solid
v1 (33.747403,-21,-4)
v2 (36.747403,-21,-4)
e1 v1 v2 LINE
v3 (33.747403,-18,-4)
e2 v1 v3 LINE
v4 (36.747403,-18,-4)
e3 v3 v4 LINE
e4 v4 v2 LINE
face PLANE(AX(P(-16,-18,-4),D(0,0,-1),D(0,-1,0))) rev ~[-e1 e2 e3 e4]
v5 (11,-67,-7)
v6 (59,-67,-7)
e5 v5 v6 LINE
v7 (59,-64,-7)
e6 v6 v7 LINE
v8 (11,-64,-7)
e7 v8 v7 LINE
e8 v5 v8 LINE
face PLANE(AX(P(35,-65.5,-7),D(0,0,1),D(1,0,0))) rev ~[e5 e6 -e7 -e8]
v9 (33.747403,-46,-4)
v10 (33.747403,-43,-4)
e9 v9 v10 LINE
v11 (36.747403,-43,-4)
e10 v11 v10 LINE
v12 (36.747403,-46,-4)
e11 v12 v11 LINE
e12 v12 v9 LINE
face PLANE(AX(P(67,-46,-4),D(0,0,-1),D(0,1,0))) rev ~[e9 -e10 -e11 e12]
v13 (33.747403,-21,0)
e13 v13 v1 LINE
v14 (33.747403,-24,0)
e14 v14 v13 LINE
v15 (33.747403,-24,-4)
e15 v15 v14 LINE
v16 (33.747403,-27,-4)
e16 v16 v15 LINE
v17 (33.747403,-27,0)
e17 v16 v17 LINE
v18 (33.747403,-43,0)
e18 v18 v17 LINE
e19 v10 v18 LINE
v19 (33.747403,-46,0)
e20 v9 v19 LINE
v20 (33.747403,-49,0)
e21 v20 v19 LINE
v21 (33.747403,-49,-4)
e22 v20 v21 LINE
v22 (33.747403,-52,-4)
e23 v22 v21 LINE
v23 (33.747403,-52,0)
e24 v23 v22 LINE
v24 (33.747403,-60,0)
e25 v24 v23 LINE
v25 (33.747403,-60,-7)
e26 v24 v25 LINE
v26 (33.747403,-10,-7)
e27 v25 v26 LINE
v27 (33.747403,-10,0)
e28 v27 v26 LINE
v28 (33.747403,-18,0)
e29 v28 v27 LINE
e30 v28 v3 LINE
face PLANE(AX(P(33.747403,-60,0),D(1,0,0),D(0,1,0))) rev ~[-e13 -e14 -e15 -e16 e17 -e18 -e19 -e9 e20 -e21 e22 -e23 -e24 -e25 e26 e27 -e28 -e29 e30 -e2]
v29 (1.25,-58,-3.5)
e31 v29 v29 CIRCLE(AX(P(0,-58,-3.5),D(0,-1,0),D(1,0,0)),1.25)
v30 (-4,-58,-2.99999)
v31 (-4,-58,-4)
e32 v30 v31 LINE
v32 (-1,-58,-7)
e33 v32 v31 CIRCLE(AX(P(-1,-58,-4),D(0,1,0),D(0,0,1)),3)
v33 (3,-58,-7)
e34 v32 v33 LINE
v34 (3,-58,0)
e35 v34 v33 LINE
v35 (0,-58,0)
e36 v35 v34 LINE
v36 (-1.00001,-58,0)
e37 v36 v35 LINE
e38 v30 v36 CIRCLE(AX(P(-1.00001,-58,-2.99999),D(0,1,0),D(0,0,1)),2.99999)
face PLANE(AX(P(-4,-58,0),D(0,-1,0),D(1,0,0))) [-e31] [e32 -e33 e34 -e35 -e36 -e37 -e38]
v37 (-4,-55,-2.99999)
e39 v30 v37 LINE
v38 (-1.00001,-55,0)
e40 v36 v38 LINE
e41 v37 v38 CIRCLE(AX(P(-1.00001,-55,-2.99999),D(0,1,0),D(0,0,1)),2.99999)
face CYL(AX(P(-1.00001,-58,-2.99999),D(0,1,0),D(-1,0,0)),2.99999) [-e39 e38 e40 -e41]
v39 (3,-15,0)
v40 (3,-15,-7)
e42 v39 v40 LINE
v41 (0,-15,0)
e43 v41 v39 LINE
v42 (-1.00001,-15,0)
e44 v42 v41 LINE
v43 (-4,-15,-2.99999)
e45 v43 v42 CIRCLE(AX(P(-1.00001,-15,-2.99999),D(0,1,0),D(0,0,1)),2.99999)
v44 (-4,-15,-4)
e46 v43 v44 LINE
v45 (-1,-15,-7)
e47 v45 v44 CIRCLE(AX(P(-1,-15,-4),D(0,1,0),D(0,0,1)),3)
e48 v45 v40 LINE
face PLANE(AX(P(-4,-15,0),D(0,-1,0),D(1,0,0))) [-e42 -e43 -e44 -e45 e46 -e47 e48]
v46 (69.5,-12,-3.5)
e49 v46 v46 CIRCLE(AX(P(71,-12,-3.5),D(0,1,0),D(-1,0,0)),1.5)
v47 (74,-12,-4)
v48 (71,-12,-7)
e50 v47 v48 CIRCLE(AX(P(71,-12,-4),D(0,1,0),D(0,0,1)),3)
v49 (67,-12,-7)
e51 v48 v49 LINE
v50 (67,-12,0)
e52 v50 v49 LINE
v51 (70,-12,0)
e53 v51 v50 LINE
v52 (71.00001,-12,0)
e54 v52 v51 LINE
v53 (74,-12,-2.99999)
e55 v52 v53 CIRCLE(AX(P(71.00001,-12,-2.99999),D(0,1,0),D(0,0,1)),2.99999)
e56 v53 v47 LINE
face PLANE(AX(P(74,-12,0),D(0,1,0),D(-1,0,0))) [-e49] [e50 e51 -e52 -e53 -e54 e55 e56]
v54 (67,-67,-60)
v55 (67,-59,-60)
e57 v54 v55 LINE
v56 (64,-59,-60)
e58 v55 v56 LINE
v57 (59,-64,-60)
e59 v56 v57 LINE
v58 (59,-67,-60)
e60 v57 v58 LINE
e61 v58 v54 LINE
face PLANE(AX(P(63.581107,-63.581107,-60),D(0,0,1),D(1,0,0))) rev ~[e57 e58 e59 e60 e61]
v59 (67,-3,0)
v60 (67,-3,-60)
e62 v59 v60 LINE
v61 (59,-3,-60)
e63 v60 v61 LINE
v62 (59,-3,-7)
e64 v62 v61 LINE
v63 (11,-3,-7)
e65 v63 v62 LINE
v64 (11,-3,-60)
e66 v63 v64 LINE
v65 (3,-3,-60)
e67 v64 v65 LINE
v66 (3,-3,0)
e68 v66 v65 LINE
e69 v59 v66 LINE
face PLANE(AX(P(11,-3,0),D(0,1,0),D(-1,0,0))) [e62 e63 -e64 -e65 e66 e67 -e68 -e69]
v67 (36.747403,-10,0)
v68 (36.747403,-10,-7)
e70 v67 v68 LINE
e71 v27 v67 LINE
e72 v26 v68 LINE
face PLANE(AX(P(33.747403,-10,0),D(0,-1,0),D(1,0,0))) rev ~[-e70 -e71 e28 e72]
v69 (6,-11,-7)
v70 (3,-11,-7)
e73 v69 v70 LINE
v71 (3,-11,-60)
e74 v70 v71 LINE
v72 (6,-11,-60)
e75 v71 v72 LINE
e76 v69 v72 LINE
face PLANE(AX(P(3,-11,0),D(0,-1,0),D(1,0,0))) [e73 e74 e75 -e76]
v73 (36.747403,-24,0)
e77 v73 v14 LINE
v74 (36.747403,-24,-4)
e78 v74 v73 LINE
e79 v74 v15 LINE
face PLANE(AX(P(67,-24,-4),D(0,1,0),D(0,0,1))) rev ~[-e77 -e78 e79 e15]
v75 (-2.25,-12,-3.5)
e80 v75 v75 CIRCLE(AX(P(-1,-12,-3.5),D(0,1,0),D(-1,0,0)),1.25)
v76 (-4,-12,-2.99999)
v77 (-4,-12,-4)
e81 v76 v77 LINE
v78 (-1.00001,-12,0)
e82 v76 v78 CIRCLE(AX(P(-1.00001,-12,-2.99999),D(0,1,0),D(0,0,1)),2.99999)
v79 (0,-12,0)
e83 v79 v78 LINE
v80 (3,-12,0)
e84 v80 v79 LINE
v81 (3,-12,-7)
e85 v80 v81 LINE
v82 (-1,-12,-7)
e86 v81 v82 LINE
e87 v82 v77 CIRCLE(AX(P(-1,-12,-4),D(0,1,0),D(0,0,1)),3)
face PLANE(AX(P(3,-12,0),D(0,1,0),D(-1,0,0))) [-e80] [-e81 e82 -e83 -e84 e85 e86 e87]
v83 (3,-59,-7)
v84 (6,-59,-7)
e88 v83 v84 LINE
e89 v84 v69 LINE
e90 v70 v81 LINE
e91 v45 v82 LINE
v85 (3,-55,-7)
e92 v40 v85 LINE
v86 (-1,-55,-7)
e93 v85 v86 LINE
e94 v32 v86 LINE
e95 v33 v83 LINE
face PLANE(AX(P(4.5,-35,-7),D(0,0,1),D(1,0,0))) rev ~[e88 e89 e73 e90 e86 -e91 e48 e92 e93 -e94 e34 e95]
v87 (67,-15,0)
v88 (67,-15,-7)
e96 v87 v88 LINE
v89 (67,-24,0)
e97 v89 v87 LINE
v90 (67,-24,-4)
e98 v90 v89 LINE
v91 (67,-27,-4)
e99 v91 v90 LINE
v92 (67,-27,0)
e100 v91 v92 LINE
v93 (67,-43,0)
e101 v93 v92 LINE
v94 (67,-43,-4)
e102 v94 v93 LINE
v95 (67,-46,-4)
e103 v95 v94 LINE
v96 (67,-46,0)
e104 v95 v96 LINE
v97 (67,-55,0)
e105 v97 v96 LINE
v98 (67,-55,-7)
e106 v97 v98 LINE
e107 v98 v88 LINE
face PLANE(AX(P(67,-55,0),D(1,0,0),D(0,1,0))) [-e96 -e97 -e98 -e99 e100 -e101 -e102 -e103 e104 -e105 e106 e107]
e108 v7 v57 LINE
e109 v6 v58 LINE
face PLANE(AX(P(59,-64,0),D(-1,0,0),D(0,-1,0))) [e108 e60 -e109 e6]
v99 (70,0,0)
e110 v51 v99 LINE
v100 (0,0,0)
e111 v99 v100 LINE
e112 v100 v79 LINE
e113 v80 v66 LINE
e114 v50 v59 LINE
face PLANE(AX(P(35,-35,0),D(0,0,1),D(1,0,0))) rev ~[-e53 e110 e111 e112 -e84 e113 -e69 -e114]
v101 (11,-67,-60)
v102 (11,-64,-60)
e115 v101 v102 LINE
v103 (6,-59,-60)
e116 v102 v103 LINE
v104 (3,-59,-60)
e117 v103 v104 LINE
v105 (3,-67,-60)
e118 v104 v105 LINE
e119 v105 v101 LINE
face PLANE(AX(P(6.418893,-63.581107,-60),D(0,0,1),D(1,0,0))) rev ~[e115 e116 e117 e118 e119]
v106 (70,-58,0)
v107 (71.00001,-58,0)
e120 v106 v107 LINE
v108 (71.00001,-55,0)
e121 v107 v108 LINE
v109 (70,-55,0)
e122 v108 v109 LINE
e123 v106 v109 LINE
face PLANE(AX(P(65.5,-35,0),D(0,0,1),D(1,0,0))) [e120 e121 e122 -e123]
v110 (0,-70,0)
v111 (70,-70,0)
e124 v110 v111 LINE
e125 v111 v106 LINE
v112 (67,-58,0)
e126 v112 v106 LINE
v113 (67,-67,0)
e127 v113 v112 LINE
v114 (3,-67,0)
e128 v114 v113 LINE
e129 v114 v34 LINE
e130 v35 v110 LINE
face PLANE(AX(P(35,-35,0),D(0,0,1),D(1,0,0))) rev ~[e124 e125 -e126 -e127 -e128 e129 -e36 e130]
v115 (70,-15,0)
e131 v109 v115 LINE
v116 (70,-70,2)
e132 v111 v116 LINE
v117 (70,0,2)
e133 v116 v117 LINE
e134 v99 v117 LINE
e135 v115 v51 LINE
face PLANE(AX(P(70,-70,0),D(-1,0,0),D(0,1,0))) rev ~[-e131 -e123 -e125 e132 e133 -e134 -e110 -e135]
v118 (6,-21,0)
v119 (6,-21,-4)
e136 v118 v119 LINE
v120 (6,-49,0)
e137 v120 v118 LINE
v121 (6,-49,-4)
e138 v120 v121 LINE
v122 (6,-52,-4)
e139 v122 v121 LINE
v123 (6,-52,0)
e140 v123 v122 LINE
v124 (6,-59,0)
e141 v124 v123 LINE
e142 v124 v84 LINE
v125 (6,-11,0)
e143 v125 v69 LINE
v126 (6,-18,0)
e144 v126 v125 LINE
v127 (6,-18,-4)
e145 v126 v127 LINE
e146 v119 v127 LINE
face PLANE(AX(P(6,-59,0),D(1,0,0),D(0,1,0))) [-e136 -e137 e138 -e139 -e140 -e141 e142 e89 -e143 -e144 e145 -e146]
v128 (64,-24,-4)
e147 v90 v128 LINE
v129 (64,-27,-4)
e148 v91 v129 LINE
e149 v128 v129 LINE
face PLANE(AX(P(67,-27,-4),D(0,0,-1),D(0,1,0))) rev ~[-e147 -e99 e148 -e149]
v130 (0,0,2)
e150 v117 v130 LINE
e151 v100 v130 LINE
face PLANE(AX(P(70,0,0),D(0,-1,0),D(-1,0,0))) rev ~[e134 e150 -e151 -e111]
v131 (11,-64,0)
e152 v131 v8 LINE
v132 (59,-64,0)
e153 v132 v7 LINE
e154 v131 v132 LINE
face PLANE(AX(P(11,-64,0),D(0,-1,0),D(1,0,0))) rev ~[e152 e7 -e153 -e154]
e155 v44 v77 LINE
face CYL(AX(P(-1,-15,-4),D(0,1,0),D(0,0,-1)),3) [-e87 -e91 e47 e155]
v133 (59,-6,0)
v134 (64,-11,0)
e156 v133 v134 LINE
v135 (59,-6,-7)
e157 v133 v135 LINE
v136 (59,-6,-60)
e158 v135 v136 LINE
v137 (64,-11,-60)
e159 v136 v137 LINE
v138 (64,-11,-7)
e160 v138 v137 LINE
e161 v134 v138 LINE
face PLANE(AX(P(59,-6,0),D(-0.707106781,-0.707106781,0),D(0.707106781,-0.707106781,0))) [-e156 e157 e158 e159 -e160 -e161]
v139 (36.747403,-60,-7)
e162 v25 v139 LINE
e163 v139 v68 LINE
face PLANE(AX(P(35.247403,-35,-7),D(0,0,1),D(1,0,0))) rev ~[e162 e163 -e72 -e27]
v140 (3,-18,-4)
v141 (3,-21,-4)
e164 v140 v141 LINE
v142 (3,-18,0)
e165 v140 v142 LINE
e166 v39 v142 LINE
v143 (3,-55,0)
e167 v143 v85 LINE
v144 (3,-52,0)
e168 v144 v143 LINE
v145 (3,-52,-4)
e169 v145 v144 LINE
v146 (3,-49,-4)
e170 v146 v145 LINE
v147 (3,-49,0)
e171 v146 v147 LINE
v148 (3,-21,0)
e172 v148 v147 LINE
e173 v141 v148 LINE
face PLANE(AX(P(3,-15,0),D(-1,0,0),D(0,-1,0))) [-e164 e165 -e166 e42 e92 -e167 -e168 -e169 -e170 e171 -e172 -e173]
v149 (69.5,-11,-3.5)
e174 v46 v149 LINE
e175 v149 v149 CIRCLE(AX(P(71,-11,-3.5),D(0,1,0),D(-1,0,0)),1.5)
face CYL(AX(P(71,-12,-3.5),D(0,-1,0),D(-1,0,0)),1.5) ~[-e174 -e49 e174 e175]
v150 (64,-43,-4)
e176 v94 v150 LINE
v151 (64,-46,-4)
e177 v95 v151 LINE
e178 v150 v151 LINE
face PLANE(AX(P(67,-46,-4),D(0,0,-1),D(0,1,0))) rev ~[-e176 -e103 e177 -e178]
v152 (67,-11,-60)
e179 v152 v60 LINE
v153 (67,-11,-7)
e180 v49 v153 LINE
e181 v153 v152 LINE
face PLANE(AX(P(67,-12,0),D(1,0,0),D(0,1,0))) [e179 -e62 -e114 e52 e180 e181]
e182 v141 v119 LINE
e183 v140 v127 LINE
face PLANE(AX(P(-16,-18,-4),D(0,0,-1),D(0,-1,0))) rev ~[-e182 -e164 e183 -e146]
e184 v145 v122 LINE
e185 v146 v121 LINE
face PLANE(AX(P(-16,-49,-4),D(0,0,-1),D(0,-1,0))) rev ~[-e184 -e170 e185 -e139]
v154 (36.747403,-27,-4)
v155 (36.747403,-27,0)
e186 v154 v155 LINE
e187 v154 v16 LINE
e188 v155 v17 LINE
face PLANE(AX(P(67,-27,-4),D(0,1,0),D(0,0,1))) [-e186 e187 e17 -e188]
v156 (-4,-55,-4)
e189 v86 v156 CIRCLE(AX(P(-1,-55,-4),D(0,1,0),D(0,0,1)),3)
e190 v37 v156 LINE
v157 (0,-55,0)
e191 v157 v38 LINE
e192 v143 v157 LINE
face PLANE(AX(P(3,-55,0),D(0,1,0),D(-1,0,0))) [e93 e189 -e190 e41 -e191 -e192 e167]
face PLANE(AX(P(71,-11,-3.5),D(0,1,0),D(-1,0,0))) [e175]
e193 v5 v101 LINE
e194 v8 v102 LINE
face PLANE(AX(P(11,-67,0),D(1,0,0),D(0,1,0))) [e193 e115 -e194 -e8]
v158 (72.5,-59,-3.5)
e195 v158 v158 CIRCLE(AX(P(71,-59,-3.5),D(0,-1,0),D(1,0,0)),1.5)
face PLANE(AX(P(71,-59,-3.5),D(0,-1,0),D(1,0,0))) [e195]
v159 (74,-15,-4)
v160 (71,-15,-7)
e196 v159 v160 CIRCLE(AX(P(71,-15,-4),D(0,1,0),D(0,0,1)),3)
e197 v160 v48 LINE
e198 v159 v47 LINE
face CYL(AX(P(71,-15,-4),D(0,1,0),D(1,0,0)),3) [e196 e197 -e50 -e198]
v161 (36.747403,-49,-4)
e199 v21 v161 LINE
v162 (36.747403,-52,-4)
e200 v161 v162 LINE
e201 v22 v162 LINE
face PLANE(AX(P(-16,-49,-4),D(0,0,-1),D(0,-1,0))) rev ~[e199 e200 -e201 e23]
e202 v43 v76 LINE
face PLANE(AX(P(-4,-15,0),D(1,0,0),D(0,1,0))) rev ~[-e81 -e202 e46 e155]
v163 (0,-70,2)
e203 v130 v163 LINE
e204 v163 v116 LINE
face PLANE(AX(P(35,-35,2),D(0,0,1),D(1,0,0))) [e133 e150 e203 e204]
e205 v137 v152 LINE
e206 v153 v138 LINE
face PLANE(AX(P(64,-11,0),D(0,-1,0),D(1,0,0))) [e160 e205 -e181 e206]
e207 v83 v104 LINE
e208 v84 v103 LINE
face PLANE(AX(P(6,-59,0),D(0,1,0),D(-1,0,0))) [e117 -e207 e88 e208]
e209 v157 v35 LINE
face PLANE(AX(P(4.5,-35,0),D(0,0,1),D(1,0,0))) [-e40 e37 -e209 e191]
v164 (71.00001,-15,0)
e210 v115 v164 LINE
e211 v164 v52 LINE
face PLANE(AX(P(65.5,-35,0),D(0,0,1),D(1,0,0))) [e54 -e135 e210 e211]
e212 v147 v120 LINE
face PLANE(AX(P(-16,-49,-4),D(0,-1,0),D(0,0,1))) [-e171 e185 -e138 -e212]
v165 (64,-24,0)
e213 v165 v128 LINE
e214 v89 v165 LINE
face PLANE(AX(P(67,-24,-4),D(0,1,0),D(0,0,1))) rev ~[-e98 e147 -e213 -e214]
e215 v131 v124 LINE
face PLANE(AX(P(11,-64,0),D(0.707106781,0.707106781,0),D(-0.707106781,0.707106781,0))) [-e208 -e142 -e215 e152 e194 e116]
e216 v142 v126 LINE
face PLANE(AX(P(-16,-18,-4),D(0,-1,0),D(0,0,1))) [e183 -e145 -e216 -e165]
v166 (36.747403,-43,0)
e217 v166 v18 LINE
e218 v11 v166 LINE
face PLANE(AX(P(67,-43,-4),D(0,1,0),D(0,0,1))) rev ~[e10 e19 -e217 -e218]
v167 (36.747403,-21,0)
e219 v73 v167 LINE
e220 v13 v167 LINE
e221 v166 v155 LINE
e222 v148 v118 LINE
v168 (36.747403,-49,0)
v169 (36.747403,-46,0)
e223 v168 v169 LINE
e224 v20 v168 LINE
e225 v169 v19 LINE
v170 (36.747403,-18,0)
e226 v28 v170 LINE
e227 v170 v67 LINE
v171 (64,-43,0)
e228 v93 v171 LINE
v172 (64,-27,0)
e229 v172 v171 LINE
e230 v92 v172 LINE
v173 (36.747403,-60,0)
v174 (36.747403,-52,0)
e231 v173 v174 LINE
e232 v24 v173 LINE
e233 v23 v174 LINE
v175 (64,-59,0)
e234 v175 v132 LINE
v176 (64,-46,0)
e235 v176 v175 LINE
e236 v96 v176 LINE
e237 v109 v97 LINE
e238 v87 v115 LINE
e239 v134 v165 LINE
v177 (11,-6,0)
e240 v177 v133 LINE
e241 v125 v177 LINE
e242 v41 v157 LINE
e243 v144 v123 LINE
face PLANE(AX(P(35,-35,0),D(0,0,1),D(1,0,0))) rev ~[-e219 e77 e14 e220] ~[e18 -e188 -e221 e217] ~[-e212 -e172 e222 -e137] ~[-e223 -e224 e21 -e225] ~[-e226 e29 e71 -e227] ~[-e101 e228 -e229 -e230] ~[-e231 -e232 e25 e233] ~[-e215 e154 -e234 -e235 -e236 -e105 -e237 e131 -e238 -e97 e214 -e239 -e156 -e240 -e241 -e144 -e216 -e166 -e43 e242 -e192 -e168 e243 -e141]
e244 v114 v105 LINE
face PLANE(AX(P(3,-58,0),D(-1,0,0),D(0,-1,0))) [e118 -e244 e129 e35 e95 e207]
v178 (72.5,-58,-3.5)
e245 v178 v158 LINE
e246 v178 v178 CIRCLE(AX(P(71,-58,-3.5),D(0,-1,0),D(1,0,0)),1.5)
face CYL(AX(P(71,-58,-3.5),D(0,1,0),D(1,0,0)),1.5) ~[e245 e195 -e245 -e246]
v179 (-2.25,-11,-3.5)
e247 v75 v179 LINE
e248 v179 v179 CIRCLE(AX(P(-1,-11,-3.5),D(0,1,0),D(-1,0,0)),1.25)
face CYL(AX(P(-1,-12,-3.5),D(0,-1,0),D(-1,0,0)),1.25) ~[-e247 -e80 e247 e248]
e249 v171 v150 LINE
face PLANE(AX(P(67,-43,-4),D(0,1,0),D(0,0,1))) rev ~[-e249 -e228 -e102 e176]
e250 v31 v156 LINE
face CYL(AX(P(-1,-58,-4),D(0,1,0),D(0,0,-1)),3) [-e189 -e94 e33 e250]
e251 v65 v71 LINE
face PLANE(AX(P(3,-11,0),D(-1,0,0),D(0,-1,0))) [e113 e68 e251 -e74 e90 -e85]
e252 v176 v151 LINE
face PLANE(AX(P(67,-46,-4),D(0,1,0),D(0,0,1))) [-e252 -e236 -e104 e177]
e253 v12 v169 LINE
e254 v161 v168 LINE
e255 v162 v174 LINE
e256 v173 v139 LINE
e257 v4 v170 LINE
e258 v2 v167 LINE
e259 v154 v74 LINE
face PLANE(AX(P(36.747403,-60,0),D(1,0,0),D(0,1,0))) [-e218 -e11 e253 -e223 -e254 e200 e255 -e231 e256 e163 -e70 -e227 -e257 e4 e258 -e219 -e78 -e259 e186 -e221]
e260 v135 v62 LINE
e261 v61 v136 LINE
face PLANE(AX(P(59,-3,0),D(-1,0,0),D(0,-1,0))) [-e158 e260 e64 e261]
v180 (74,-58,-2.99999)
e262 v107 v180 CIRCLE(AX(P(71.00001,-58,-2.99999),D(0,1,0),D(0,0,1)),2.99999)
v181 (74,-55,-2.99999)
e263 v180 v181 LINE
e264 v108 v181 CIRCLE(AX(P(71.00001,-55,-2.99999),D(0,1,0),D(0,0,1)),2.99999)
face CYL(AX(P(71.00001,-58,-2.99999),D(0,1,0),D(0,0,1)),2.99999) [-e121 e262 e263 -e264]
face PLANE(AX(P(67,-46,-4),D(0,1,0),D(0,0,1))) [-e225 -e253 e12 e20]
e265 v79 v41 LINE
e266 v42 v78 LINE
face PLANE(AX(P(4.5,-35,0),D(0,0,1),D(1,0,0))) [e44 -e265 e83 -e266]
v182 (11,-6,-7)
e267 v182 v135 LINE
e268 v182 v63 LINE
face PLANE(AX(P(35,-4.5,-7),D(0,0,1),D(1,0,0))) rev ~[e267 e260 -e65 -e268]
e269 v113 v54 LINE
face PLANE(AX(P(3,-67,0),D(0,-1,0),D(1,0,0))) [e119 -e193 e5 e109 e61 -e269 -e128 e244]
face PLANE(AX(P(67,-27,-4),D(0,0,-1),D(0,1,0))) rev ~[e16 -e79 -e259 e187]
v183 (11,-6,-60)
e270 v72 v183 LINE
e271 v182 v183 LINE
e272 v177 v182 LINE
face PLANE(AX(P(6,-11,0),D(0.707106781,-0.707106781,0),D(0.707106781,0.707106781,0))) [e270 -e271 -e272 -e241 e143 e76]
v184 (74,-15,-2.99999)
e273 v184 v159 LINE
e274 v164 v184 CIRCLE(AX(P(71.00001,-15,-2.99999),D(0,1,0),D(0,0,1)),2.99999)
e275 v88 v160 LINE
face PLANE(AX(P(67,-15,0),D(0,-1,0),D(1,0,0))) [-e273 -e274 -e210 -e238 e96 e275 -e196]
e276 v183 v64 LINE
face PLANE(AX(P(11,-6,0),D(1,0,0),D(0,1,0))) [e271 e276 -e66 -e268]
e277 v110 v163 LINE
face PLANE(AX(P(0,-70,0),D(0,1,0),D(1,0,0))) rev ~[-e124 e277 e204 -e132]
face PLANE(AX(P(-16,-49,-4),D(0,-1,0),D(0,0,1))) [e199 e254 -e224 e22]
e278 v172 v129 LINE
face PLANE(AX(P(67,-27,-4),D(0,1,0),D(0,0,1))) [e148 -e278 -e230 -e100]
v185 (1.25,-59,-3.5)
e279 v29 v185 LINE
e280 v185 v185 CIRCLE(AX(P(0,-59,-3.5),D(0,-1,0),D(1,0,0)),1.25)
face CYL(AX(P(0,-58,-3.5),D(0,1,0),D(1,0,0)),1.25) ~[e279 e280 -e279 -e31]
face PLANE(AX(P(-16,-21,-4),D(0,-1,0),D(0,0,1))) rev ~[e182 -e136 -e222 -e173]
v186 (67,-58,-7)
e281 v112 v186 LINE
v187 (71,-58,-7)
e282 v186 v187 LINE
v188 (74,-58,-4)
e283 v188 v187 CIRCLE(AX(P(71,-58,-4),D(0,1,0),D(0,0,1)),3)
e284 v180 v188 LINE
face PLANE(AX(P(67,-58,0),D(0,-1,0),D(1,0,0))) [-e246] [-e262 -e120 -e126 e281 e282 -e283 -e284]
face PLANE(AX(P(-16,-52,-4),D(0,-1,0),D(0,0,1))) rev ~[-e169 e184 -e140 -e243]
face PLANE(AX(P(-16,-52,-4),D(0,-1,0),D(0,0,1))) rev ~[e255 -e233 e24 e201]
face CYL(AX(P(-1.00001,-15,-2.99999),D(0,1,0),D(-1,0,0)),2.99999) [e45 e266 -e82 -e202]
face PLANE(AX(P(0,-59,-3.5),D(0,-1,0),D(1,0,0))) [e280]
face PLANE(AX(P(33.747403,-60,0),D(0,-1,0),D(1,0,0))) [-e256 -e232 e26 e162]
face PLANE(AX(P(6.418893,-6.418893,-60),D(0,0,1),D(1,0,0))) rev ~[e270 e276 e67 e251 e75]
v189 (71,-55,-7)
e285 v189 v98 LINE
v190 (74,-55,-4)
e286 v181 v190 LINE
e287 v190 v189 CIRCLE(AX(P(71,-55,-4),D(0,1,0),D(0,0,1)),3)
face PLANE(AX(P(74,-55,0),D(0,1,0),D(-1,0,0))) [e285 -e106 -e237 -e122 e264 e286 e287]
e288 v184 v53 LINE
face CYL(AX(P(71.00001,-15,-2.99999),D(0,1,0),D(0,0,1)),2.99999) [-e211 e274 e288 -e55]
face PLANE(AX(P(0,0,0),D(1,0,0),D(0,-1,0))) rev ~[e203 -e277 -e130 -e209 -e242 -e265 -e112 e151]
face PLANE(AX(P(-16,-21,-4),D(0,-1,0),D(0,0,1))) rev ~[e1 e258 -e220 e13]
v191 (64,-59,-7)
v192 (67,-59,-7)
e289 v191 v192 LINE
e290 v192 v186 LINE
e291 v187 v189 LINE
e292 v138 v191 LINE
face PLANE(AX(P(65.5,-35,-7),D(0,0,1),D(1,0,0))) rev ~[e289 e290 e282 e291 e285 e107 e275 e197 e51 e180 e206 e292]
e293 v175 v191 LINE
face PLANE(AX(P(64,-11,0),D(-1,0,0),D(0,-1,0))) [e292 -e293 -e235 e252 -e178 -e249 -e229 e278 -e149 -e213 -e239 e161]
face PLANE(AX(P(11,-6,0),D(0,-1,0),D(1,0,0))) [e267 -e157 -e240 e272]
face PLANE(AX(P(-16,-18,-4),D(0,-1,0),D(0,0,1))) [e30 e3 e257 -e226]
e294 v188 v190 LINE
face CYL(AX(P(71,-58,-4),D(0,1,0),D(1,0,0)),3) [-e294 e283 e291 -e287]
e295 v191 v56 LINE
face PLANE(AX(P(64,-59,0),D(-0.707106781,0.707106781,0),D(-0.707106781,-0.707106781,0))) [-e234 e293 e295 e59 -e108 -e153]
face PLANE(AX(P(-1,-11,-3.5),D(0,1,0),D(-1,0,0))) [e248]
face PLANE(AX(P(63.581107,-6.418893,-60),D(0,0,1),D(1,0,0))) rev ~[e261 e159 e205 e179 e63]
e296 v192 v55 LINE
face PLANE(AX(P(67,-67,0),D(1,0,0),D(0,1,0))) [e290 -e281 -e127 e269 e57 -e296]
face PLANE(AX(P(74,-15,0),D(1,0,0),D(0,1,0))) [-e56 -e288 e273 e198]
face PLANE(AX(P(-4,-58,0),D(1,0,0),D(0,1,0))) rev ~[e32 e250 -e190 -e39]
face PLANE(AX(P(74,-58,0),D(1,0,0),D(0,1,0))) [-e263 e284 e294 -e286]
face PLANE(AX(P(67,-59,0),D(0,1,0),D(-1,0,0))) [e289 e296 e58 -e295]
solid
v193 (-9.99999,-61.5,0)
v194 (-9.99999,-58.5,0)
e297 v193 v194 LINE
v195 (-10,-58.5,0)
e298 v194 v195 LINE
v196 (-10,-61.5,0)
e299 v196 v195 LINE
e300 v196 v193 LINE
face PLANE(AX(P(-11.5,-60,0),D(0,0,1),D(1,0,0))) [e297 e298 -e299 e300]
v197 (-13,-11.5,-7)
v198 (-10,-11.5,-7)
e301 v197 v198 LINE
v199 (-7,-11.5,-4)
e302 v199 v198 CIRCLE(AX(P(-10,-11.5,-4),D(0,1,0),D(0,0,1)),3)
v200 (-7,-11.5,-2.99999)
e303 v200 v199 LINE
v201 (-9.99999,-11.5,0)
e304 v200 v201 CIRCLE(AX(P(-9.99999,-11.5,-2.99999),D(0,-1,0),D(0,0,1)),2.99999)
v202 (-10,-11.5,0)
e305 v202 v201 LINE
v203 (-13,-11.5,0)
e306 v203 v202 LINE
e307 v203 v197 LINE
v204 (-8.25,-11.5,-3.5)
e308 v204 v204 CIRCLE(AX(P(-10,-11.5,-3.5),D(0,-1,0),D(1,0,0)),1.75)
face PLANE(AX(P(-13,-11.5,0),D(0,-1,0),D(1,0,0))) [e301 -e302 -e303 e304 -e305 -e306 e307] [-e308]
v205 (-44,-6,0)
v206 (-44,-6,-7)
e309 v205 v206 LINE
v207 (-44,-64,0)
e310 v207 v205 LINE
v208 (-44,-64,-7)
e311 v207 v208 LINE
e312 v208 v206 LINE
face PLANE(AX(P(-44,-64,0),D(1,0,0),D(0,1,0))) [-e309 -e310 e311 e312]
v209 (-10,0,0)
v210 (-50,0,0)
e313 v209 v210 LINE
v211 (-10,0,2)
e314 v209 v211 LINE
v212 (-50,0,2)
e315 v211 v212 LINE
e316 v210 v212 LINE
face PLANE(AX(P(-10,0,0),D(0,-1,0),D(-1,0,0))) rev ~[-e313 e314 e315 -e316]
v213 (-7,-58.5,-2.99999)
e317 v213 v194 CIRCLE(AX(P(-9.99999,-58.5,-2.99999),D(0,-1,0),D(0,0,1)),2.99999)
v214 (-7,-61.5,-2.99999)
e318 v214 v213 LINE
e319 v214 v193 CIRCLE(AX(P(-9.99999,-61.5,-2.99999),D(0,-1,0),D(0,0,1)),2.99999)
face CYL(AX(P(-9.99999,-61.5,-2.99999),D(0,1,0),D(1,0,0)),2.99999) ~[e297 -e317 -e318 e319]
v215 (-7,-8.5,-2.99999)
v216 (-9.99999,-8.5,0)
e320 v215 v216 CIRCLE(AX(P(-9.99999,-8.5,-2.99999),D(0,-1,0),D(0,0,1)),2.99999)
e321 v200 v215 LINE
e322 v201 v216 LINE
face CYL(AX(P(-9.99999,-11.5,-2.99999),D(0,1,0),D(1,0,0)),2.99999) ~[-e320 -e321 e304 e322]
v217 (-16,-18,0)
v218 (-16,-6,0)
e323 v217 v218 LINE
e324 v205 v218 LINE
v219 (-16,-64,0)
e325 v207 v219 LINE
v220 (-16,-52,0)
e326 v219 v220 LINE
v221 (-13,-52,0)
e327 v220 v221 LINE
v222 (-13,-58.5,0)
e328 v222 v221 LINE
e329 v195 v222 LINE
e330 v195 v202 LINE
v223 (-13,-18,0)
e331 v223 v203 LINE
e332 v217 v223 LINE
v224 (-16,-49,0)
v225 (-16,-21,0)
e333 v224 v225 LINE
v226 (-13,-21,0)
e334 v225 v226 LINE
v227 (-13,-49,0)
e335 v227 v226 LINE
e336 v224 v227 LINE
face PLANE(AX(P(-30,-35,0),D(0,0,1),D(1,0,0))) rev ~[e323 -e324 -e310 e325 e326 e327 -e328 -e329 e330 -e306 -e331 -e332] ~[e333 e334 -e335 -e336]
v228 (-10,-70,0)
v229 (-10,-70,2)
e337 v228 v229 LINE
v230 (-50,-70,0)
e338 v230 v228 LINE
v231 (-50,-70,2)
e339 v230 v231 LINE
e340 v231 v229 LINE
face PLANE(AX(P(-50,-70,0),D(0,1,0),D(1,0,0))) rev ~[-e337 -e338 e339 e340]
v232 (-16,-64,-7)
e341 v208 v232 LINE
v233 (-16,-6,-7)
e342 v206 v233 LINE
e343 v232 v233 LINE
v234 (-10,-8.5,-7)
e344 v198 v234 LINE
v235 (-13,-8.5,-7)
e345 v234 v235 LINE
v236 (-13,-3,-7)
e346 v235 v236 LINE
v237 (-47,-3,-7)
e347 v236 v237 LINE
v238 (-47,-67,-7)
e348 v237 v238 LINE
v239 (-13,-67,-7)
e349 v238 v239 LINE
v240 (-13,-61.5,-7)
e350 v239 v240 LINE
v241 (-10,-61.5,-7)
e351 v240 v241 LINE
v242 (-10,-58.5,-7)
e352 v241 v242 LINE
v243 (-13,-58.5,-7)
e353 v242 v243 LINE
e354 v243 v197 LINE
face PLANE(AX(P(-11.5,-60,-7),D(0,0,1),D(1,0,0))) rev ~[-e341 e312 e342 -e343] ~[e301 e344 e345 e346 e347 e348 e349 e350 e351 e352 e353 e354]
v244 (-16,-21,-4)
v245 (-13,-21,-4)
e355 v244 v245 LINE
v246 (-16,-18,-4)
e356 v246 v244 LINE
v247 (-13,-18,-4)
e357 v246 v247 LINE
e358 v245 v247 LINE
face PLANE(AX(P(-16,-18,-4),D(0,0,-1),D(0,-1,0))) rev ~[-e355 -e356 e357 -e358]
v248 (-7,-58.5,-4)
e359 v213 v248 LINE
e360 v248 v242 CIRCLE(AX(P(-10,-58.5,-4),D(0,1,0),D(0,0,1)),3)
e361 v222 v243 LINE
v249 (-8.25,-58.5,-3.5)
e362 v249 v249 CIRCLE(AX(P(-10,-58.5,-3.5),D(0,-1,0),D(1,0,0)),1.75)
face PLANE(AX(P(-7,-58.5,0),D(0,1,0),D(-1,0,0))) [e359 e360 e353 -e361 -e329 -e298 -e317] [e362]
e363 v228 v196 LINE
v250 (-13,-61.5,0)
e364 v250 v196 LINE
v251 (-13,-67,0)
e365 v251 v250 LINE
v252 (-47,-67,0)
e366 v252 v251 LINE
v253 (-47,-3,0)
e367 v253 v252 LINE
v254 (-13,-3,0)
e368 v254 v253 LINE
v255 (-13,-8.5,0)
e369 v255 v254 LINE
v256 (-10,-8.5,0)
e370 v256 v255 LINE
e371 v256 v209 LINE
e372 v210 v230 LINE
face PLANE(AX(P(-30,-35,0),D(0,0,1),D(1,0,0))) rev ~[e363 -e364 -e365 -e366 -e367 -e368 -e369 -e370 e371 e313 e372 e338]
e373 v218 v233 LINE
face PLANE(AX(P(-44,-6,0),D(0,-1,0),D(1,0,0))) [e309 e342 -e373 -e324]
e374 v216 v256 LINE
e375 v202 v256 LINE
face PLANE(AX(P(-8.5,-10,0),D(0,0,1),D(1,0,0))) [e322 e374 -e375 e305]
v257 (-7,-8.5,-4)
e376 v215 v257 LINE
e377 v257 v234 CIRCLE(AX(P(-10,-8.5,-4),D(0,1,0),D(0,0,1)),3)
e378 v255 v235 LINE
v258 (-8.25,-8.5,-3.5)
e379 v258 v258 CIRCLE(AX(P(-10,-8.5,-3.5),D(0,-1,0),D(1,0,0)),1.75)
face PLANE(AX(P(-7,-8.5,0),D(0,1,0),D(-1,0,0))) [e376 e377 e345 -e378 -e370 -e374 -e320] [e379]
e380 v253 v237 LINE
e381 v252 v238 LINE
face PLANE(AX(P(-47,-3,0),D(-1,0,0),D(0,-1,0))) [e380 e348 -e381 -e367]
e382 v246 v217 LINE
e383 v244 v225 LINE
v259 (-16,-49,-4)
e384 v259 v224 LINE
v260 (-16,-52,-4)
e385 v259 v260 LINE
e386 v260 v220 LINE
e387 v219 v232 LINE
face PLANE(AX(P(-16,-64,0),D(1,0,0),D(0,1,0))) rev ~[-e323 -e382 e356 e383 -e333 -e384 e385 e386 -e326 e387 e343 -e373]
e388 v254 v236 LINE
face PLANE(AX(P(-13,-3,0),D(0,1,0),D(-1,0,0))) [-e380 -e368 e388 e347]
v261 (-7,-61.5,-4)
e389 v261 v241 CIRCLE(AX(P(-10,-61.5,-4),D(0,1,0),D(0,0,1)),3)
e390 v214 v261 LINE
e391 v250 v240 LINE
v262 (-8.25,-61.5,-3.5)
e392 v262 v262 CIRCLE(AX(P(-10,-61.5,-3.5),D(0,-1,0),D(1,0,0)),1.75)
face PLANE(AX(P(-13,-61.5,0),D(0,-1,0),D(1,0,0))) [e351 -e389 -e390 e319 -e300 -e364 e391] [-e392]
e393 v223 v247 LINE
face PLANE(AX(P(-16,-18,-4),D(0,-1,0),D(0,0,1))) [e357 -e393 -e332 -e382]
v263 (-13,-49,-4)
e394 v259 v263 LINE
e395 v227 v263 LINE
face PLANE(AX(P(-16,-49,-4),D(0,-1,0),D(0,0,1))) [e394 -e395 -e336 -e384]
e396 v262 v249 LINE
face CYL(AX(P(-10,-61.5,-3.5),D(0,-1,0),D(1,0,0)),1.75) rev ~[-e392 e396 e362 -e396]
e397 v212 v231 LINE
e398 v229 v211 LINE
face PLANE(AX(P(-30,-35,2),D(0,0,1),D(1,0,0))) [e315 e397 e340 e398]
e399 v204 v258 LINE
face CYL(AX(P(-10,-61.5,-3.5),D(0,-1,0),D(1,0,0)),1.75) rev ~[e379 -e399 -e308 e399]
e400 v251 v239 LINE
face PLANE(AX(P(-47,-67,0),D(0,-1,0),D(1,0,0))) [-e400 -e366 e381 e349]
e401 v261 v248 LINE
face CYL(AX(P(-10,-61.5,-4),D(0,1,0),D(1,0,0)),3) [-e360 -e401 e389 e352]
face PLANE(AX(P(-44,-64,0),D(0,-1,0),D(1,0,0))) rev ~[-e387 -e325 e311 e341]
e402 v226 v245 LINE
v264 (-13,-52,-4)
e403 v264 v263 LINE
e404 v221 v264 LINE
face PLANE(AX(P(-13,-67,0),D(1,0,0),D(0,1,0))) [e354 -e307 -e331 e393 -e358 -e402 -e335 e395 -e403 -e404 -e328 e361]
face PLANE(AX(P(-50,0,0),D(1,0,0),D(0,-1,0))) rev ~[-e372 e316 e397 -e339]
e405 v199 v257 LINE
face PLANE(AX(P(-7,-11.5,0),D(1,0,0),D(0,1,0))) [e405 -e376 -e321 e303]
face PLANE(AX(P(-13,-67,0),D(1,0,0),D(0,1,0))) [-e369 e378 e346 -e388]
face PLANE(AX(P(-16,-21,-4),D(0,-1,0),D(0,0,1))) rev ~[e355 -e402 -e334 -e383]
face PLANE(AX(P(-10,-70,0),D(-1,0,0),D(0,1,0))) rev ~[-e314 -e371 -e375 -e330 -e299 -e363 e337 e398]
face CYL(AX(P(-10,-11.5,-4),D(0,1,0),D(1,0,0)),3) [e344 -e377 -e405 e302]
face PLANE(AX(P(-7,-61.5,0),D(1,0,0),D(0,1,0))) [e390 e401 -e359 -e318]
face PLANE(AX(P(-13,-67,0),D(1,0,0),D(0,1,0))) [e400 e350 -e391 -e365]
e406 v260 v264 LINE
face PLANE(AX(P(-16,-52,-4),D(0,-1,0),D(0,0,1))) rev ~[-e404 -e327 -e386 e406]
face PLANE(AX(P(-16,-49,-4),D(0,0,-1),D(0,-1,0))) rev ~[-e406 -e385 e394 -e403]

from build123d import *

# Parameters (mm, degrees)
F0_W      = 3
F0_H      = 50
F0_W_2    = 48
F0_H_2    = 3
F0_H_3    = 40
F1_DEPTH  = 2
F2_DEPTH  = 60
F0_W_3    = 4
F3_DEPTH  = 7
F4_R      = 1.25
F4_R_2    = 1.5
F5_DEPTH  = 1
F6_R      = 1.25
F6_R_2    = 1.5
F7_DEPTH  = 1
F8_W      = 28
F8_H      = 58
F8_W_2    = 3
F8_H_2    = 47
F8_H_3    = 3
F9_DEPTH  = 2
F10_DEPTH = 7
F11_DEPTH = 7
F12_R     = 1.75
F13_DEPTH = 61.501
F14_W     = 3
F14_H     = 4
F15_DEPTH = 52.7474034429
F16_R     = 3
F16_2_R   = 3
F17_R     = 2.99999
F17_2_R   = 2.99999
F18_W     = 3
F18_H     = 4
F19_DEPTH = 33.2525965571


# Not quite as in the source:
# - a fillet or chamfer is up to 0.001 mm smaller than in the source, because OpenCascade refuses the exact size


with BuildPart() as f1:
    # F0 (on Top) → F1 (new body)
    with BuildSketch(Plane.XY):
        Polygon((11, -6), (6, -11), (6, -59), (11, -64), (59, -64), (64, -59), (64, -11), (59, -6), align=None)
        with Locations((35.2474034429, -35)):
            Rectangle(F0_W, F0_H, mode=Mode.SUBTRACT)
        Polygon((67, -15), (67, -12), (67, -11), (64, -11), (64, -59), (67, -59), (67, -58), (67, -55), align=None)
        Polygon((70, 0), (0, 0), (0, -12), (3, -12), (3, -11), (3, -3), (11, -3), (59, -3), (67, -3), (67, -11), (67, -12), (70, -12), align=None)
        Polygon((3, -11), (3, -12), (3, -15), (3, -55), (3, -58), (3, -59), (6, -59), (6, -11), align=None)
        with Locations((35, -65.5)):
            Rectangle(F0_W_2, F0_H_2)
        Polygon((67, -59), (64, -59), (59, -64), (59, -67), (67, -67), align=None)
        Polygon((11, -64), (6, -59), (3, -59), (3, -67), (11, -67), align=None)
        Polygon((64, -11), (67, -11), (67, -3), (59, -3), (59, -6), align=None)
        with Locations((35, -4.5)):
            Rectangle(F0_W_2, F0_H_2)
        Polygon((3, -3), (3, -11), (6, -11), (11, -6), (11, -3), align=None)
        with Locations((68.5, -35)):
            Rectangle(F0_W, F0_H_3)
        with Locations((68.5, -13.5)):
            Rectangle(F0_W, F0_H_2)
        with Locations((68.5, -56.5)):
            Rectangle(F0_W, F0_H_2)
        Polygon((3, -58), (0, -58), (0, -70), (70, -70), (70, -58), (67, -58), (67, -59), (67, -67), (59, -67), (11, -67), (3, -67), (3, -59), align=None)
        with Locations((1.5, -35)):
            Rectangle(F0_W, F0_H_3)
        with Locations((1.5, -56.5)):
            Rectangle(F0_W, F0_H_2)
        with Locations((1.5, -13.5)):
            Rectangle(F0_W, F0_H_2)
        with Locations((35.2474034429, -35)):
            Rectangle(F0_W, F0_H)
    extrude(amount=F1_DEPTH)

    # F0 (on Top) → F2 (join)
    with BuildSketch(Plane.XY):
        Polygon((67, -59), (64, -59), (59, -64), (59, -67), (67, -67), align=None)
        Polygon((64, -11), (67, -11), (67, -3), (59, -3), (59, -6), align=None)
        Polygon((3, -3), (3, -11), (6, -11), (11, -6), (11, -3), align=None)
        Polygon((11, -64), (6, -59), (3, -59), (3, -67), (11, -67), align=None)
    extrude(amount=-F2_DEPTH)

    # F0 (on Top) → F3 (join)
    with BuildSketch(Plane.XY):
        Polygon((3, -11), (3, -12), (3, -15), (3, -55), (3, -58), (3, -59), (6, -59), (6, -11), align=None)
        with Locations((-2, -56.5)):
            Rectangle(F0_W_3, F0_H_2)
        with Locations((1.5, -56.5)):
            Rectangle(F0_W, F0_H_2)
        with Locations((1.5, -13.5)):
            Rectangle(F0_W, F0_H_2)
        with Locations((-2, -13.5)):
            Rectangle(F0_W_3, F0_H_2)
        with Locations((35, -65.5)):
            Rectangle(F0_W_2, F0_H_2)
        Polygon((67, -15), (67, -12), (67, -11), (64, -11), (64, -59), (67, -59), (67, -58), (67, -55), align=None)
        with Locations((68.5, -56.5)):
            Rectangle(F0_W, F0_H_2)
        with Locations((72, -56.5)):
            Rectangle(F0_W_3, F0_H_2)
        with Locations((72, -13.5)):
            Rectangle(F0_W_3, F0_H_2)
        with Locations((68.5, -13.5)):
            Rectangle(F0_W, F0_H_2)
        with Locations((35, -4.5)):
            Rectangle(F0_W_2, F0_H_2)
        with Locations((35.2474034429, -35)):
            Rectangle(F0_W, F0_H)
    extrude(amount=-F3_DEPTH)

    # F4 (on face) → F5 (join)
    with BuildSketch(Plane(origin=(0, -12, 0), x_dir=(-1, 0, 0), z_dir=(0, 1, 0))):
        with Locations((1, -3.5)):
            Circle(F4_R)
        with Locations((-71, -3.5)):
            Circle(F4_R_2)
    extrude(amount=F5_DEPTH)

    # F6 (on face) → F7 (join)
    with BuildSketch(Plane.XZ.offset(58)):
        with Locations((0, -3.5)):
            Circle(F6_R)
        with Locations((71, -3.5)):
            Circle(F6_R_2)
    extrude(amount=F7_DEPTH)


with BuildPart() as f9:
    # F8 (on Top) → F9 (new body)
    with BuildSketch(Plane.XY):
        Polygon((-13, -11.5), (-13, -8.5), (-13, -3), (-47, -3), (-47, -67), (-13, -67), (-13, -61.5), (-13, -58.5), align=None)
        with Locations((-30, -35)):
            Rectangle(F8_W, F8_H, mode=Mode.SUBTRACT)
        with Locations((-30, -35)):
            Rectangle(F8_W, F8_H)
        Polygon((-10, -8.5), (-10, 0), (-50, 0), (-50, -70), (-10, -70), (-10, -61.5), (-13, -61.5), (-13, -67), (-47, -67), (-47, -3), (-13, -3), (-13, -8.5), align=None)
        with Locations((-11.5, -35)):
            Rectangle(F8_W_2, F8_H_2)
        with Locations((-11.5, -60)):
            Rectangle(F8_W_2, F8_H_3)
        with Locations((-11.5, -10)):
            Rectangle(F8_W_2, F8_H_3)
    extrude(amount=F9_DEPTH)

    # F8 (on Top) → F10 (join)
    with BuildSketch(Plane.XY):
        Polygon((-13, -11.5), (-13, -8.5), (-13, -3), (-47, -3), (-47, -67), (-13, -67), (-13, -61.5), (-13, -58.5), align=None)
        with Locations((-30, -35)):
            Rectangle(F8_W, F8_H, mode=Mode.SUBTRACT)
    extrude(amount=-F10_DEPTH)

    # F8 (on Top) → F11 (join)
    with BuildSketch(Plane.XY):
        with Locations((-11.5, -60)):
            Rectangle(F8_W_2, F8_H_3)
        with Locations((-8.5, -60)):
            Rectangle(F8_W_2, F8_H_3)
        with Locations((-8.5, -10)):
            Rectangle(F8_W_2, F8_H_3)
        with Locations((-11.5, -10)):
            Rectangle(F8_W_2, F8_H_3)
    extrude(amount=-F11_DEPTH)

    # F12 (on face) → F13 (cut, through all)
    with BuildSketch(Plane.XZ.offset(61.5)):
        with Locations((-10, -3.5)):
            Circle(F12_R)
    extrude(amount=-F13_DEPTH, mode=Mode.SUBTRACT)


with BuildPart() as f15_tool:
    # F14 (on face) → F15 (new body, through all)
    with BuildSketch(Plane(origin=(-16, 0, 0), x_dir=(0, -1, 0), z_dir=(-1, 0, 0))):
        with Locations((50.5, -2)):
            Rectangle(F14_W, F14_H)
        with Locations((19.5, -2)):
            Rectangle(F14_W, F14_H)
    extrude(amount=-F15_DEPTH)


with BuildPart() as f1_1:
    add(f1.part)

    # F15: cut by f15_tool
    add(f15_tool.part, mode=Mode.SUBTRACT)

    # F16#2
    f16_2_edges = [f1_1.edges().sort_by_distance(p)[0] for p in [
        (-4, -13.5, -7),
        (-4, -56.5, -7),
        (74, -13.5, -7),
        (74, -56.5, -7),
    ]]
    fillet(f16_2_edges, radius=F16_2_R)

    # F17 (radius 3 in the source; OpenCascade refuses exactly that, so slightly less here)
    f17_edges = [f1_1.edges().sort_by_distance(p)[0] for p in [
        (-4, -13.5, 0),
        (-4, -56.5, 0),
        (74, -13.5, 0),
        (74, -56.5, 0),
    ]]
    fillet(f17_edges, radius=F17_R)

    # F18 (on face) → F19 (cut, through all)
    with BuildSketch(Plane.YZ.offset(67)):
        with Locations((-44.5, -2)):
            Rectangle(F18_W, F18_H)
        with Locations((-25.5, -2)):
            Rectangle(F18_W, F18_H)
    extrude(amount=-F19_DEPTH, mode=Mode.SUBTRACT)


with BuildPart() as f9_1:
    add(f9.part)

    # F15: cut by f15_tool
    add(f15_tool.part, mode=Mode.SUBTRACT)

    # F16
    f16_edges = [f9_1.edges().sort_by_distance(p)[0] for p in [
        (-7, -10, -7),
        (-7, -60, -7),
    ]]
    fillet(f16_edges, radius=F16_R)

    # F17#2 (radius 3 in the source; OpenCascade refuses exactly that, so slightly less here)
    f17_2_edges = [f9_1.edges().sort_by_distance(p)[0] for p in [
        (-7, -60, 0),
        (-7, -10, 0),
    ]]
    fillet(f17_2_edges, radius=F17_2_R)


solid = Compound([f1_1.part, f9_1.part])
